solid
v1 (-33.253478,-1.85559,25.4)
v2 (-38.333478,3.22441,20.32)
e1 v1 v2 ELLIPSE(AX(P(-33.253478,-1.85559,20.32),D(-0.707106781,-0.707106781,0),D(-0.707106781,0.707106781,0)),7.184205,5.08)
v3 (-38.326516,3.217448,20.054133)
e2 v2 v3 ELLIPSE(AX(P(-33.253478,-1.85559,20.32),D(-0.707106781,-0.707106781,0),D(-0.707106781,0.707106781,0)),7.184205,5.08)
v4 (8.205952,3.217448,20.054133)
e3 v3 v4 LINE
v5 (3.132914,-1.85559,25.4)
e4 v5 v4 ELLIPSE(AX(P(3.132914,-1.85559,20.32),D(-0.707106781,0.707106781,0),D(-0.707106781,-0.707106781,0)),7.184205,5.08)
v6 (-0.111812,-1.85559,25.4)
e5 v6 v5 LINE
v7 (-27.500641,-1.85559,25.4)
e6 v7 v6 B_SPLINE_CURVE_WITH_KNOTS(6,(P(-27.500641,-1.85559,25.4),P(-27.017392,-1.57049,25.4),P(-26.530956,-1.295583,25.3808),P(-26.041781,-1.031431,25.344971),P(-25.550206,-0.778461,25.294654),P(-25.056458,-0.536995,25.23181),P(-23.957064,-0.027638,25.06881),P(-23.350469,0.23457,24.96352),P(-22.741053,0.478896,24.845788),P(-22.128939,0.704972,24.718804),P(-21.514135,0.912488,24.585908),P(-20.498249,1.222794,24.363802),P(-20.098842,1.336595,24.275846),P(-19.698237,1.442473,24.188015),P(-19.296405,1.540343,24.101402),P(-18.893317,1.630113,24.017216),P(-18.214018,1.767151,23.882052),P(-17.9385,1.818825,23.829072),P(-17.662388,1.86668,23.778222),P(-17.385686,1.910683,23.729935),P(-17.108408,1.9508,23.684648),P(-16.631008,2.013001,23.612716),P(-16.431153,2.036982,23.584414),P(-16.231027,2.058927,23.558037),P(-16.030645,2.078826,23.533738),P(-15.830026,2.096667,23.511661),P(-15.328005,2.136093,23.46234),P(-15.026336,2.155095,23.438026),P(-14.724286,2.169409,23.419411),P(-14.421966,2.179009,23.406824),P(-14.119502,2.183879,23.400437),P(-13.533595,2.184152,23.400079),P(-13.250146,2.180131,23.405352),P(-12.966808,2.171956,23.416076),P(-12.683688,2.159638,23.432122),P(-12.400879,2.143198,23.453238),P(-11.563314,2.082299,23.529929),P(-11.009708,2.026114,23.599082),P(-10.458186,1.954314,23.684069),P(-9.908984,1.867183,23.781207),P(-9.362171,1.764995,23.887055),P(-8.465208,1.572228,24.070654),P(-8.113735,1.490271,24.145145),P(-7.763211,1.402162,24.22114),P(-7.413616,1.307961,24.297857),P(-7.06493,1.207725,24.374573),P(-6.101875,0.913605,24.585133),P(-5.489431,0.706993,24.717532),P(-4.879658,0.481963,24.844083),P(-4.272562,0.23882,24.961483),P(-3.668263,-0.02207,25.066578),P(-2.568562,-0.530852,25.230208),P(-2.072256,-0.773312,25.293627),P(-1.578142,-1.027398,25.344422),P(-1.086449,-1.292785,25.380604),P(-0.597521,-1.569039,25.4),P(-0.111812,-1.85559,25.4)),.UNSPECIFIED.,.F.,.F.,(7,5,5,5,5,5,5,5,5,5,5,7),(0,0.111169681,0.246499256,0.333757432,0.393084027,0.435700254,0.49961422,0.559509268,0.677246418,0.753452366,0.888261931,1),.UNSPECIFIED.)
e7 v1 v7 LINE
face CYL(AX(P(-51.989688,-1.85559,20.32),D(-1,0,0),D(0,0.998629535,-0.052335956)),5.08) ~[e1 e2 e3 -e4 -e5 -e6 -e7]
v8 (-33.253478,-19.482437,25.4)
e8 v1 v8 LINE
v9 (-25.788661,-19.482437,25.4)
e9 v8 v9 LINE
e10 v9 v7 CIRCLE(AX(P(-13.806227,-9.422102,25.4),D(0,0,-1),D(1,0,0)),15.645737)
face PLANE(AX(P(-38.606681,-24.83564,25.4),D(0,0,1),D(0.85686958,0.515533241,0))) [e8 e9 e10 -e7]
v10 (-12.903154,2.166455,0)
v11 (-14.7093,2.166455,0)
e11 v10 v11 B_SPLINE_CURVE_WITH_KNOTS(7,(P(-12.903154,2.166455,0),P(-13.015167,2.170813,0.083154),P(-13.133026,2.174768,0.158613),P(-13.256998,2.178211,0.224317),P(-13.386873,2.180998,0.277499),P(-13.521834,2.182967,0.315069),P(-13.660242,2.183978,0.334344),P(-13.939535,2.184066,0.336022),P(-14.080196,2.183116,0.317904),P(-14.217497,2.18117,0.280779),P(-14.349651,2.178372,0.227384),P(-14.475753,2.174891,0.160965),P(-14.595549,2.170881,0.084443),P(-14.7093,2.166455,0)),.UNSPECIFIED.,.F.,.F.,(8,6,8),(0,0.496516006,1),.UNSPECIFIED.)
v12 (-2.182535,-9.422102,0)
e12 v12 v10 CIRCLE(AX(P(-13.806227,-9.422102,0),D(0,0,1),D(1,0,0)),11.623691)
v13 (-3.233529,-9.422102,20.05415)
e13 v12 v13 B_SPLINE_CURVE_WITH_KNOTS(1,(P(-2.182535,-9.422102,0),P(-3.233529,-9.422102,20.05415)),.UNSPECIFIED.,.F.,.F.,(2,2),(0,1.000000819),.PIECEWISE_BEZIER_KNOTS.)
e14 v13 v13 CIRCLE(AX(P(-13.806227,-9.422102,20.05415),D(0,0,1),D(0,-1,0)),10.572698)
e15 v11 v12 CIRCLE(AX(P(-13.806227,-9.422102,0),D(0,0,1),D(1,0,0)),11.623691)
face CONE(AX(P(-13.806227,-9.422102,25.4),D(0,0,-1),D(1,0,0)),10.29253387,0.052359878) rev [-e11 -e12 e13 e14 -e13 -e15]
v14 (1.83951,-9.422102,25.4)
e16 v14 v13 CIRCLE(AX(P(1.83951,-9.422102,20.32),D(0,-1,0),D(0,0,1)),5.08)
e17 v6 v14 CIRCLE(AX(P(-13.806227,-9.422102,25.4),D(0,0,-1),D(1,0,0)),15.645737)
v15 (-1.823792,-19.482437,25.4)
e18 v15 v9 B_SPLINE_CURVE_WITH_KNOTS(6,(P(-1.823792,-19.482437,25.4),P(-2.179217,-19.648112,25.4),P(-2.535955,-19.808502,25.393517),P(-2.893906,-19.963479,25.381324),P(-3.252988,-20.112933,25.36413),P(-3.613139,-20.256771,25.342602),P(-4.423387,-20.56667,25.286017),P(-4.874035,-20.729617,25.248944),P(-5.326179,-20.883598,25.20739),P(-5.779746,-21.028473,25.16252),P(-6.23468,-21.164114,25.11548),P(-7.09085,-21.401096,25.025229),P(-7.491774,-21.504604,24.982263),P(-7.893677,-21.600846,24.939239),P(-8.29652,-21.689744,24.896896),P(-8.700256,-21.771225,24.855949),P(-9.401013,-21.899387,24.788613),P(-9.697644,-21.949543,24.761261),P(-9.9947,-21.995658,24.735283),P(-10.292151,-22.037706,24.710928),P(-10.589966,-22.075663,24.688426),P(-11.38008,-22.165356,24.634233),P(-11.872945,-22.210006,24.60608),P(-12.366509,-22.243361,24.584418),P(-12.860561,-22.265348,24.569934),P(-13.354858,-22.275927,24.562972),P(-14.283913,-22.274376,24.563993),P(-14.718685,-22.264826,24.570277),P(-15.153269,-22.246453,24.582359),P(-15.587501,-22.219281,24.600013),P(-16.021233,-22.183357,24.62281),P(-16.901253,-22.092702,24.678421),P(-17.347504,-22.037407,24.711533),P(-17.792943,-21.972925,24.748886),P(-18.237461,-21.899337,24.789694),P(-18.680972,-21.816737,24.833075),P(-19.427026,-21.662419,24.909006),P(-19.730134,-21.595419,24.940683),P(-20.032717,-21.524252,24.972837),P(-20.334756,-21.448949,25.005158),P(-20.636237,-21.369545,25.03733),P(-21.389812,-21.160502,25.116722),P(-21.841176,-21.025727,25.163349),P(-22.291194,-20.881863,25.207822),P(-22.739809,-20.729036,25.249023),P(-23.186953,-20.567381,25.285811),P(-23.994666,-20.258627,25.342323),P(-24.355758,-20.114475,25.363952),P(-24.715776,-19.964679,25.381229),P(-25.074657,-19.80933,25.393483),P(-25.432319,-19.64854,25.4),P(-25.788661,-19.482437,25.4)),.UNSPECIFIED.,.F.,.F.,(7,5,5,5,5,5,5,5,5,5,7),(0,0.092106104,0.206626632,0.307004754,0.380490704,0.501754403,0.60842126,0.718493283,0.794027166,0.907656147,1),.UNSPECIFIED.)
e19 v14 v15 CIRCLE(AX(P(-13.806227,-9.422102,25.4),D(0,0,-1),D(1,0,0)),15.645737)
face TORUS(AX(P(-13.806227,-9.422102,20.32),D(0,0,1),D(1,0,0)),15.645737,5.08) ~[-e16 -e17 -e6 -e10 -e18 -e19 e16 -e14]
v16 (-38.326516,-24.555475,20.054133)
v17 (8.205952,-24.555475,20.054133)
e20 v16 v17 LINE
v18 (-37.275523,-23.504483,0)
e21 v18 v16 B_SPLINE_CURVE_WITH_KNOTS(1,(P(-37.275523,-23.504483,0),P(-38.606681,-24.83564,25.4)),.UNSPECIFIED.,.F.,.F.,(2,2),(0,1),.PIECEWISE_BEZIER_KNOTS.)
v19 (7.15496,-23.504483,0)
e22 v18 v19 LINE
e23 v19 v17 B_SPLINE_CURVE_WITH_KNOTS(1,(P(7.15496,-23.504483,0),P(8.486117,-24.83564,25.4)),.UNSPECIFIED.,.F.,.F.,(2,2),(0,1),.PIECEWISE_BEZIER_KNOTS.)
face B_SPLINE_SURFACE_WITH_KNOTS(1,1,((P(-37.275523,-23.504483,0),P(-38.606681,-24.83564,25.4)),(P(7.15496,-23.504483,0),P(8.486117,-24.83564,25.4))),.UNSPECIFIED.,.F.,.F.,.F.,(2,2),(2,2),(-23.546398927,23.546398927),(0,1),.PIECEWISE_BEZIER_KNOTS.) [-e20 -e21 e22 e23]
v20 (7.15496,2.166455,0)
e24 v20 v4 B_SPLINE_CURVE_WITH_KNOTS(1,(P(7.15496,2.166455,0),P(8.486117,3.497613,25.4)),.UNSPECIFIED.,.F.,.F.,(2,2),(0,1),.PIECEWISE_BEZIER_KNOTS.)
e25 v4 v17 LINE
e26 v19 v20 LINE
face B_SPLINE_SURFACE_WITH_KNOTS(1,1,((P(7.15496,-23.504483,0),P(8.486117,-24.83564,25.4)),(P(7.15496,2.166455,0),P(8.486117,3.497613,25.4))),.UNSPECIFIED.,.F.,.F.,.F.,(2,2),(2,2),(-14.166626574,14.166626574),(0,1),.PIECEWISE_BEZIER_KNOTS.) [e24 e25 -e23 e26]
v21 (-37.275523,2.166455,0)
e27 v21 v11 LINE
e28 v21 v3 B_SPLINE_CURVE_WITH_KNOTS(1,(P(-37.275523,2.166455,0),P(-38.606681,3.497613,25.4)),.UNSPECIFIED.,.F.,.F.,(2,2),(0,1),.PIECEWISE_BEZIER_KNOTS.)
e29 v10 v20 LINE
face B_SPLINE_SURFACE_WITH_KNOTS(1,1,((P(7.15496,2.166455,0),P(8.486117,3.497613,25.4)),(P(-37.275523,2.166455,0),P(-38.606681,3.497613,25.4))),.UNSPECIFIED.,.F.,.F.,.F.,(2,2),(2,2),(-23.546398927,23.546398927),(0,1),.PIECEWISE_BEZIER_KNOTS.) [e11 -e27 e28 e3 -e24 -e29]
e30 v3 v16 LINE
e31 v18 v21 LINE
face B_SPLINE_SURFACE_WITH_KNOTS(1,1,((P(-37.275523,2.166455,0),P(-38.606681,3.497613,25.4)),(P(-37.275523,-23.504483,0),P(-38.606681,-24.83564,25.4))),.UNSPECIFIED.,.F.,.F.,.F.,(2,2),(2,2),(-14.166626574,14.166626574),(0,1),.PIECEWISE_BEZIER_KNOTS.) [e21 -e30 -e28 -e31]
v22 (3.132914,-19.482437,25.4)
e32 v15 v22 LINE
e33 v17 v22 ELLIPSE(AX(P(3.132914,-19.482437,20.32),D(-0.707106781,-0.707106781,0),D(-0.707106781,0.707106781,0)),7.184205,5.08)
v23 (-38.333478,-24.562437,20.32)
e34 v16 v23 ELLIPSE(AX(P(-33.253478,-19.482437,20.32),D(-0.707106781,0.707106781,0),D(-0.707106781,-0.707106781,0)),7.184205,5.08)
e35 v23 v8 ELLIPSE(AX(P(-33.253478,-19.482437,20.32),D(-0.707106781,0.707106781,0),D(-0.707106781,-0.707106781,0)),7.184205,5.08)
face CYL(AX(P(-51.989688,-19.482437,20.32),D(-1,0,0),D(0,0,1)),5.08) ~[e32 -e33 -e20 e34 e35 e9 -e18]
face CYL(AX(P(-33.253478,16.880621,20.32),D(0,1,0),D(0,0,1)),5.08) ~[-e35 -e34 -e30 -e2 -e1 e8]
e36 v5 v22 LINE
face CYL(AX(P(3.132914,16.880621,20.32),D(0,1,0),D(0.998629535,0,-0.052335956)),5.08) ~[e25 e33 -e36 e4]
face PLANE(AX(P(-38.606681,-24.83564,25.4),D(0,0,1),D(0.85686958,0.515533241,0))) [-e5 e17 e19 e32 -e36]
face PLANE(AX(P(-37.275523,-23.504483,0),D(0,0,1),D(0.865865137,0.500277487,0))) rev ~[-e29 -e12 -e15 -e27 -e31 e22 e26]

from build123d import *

# Parameters (mm, degrees)
F0_W        = 44.4304826669
F0_H        = 25.670937961
F1_DEPTH    = 25.4
F1_TAPER    = -3
F2_R        = 10.2925338698
F3_DEPTH    = 25.4
F3_TAPER    = -3
F4_T1_DEPTH = 73.8588130367
F4_T3_DEPTH = 55.0992683307


# Not quite as in the source:
# - a fillet or chamfer that OpenCascade refuses, or shapes differently, is made with other operations: its cross-section is extruded or revolved along the edge and cut away or added


with BuildPart() as f1:
    # F0 (on Top) → F1 (new body)
    with BuildSketch(Plane.XY):
        with Locations((-15.0602816138, -10.6690136017)):
            Rectangle(F0_W, F0_H)
    extrude(amount=F1_DEPTH, taper=F1_TAPER)

    # F2 (on face) → F3 (cut)
    with BuildSketch(Plane.XY.offset(25.4)):
        with Locations((-13.8062266633, -9.4221020117)):
            Circle(F2_R)
    extrude(amount=-F3_DEPTH, taper=F3_TAPER, mode=Mode.SUBTRACT)

    # F4: fillet of radius 5.08 on 5 edges, made by hand

    # F4_s2 → F4_t1 (cut)
    with BuildSketch(Plane.YZ.offset(-51.9896881322)):
        with BuildLine():
            ThreePointArc((-19.4824371396, 25.4), (-23.1673389443, 23.8168412445), (-24.5554751761, 20.0541333423))
            Line((-24.5554751761, 20.0541333423), (-24.835640176, 25.4))
            Line((-24.835640176, 25.4), (-19.4824371396, 25.4))
        make_face()
        with BuildLine():
            ThreePointArc((3.2174479727, 20.0541333423), (1.8293117409, 23.8168412445), (-1.8555900639, 25.4))
            Line((-1.8555900639, 25.4), (3.4976129725, 25.4))
            Line((3.4976129725, 25.4), (3.2174479727, 20.0541333423))
        make_face()
    extrude(amount=F4_T1_DEPTH, mode=Mode.SUBTRACT)

    # F4_s4 → F4_t3 (cut)
    with BuildSketch(Plane.XZ.offset(-16.8806205636)):
        with BuildLine():
            ThreePointArc((8.2059523135, 20.0541333423), (6.8178160817, 23.8168412445), (3.132914277, 25.4))
            Line((3.132914277, 25.4), (8.4861173134, 25.4))
            Line((8.4861173134, 25.4), (8.2059523135, 20.0541333423))
        make_face()
        with BuildLine():
            ThreePointArc((-33.2534775047, 25.4), (-36.9383793094, 23.8168412445), (-38.3265155412, 20.0541333423))
            Line((-38.3265155412, 20.0541333423), (-38.6066805411, 25.4))
            Line((-38.6066805411, 25.4), (-33.2534775047, 25.4))
        make_face()
    extrude(amount=F4_T3_DEPTH, mode=Mode.SUBTRACT)

    # F4_s5 → F4_t6 (revolve, cut)
    with BuildSketch(Plane.XZ.offset(9.4221020117)):
        with BuildLine():
            ThreePointArc((1.8395102429, 25.4), (-1.8453915618, 23.8168412445), (-3.2335277936, 20.0541333423))
            Line((-3.2335277936, 20.0541333423), (-3.5136927935, 25.4))
            Line((-3.5136927935, 25.4), (1.8395102429, 25.4))
        make_face()
    revolve(axis=Axis((-13.8062266633, -9.4221020117, 25.4), (0, 0, -1)), mode=Mode.SUBTRACT)


solid = f1.part
